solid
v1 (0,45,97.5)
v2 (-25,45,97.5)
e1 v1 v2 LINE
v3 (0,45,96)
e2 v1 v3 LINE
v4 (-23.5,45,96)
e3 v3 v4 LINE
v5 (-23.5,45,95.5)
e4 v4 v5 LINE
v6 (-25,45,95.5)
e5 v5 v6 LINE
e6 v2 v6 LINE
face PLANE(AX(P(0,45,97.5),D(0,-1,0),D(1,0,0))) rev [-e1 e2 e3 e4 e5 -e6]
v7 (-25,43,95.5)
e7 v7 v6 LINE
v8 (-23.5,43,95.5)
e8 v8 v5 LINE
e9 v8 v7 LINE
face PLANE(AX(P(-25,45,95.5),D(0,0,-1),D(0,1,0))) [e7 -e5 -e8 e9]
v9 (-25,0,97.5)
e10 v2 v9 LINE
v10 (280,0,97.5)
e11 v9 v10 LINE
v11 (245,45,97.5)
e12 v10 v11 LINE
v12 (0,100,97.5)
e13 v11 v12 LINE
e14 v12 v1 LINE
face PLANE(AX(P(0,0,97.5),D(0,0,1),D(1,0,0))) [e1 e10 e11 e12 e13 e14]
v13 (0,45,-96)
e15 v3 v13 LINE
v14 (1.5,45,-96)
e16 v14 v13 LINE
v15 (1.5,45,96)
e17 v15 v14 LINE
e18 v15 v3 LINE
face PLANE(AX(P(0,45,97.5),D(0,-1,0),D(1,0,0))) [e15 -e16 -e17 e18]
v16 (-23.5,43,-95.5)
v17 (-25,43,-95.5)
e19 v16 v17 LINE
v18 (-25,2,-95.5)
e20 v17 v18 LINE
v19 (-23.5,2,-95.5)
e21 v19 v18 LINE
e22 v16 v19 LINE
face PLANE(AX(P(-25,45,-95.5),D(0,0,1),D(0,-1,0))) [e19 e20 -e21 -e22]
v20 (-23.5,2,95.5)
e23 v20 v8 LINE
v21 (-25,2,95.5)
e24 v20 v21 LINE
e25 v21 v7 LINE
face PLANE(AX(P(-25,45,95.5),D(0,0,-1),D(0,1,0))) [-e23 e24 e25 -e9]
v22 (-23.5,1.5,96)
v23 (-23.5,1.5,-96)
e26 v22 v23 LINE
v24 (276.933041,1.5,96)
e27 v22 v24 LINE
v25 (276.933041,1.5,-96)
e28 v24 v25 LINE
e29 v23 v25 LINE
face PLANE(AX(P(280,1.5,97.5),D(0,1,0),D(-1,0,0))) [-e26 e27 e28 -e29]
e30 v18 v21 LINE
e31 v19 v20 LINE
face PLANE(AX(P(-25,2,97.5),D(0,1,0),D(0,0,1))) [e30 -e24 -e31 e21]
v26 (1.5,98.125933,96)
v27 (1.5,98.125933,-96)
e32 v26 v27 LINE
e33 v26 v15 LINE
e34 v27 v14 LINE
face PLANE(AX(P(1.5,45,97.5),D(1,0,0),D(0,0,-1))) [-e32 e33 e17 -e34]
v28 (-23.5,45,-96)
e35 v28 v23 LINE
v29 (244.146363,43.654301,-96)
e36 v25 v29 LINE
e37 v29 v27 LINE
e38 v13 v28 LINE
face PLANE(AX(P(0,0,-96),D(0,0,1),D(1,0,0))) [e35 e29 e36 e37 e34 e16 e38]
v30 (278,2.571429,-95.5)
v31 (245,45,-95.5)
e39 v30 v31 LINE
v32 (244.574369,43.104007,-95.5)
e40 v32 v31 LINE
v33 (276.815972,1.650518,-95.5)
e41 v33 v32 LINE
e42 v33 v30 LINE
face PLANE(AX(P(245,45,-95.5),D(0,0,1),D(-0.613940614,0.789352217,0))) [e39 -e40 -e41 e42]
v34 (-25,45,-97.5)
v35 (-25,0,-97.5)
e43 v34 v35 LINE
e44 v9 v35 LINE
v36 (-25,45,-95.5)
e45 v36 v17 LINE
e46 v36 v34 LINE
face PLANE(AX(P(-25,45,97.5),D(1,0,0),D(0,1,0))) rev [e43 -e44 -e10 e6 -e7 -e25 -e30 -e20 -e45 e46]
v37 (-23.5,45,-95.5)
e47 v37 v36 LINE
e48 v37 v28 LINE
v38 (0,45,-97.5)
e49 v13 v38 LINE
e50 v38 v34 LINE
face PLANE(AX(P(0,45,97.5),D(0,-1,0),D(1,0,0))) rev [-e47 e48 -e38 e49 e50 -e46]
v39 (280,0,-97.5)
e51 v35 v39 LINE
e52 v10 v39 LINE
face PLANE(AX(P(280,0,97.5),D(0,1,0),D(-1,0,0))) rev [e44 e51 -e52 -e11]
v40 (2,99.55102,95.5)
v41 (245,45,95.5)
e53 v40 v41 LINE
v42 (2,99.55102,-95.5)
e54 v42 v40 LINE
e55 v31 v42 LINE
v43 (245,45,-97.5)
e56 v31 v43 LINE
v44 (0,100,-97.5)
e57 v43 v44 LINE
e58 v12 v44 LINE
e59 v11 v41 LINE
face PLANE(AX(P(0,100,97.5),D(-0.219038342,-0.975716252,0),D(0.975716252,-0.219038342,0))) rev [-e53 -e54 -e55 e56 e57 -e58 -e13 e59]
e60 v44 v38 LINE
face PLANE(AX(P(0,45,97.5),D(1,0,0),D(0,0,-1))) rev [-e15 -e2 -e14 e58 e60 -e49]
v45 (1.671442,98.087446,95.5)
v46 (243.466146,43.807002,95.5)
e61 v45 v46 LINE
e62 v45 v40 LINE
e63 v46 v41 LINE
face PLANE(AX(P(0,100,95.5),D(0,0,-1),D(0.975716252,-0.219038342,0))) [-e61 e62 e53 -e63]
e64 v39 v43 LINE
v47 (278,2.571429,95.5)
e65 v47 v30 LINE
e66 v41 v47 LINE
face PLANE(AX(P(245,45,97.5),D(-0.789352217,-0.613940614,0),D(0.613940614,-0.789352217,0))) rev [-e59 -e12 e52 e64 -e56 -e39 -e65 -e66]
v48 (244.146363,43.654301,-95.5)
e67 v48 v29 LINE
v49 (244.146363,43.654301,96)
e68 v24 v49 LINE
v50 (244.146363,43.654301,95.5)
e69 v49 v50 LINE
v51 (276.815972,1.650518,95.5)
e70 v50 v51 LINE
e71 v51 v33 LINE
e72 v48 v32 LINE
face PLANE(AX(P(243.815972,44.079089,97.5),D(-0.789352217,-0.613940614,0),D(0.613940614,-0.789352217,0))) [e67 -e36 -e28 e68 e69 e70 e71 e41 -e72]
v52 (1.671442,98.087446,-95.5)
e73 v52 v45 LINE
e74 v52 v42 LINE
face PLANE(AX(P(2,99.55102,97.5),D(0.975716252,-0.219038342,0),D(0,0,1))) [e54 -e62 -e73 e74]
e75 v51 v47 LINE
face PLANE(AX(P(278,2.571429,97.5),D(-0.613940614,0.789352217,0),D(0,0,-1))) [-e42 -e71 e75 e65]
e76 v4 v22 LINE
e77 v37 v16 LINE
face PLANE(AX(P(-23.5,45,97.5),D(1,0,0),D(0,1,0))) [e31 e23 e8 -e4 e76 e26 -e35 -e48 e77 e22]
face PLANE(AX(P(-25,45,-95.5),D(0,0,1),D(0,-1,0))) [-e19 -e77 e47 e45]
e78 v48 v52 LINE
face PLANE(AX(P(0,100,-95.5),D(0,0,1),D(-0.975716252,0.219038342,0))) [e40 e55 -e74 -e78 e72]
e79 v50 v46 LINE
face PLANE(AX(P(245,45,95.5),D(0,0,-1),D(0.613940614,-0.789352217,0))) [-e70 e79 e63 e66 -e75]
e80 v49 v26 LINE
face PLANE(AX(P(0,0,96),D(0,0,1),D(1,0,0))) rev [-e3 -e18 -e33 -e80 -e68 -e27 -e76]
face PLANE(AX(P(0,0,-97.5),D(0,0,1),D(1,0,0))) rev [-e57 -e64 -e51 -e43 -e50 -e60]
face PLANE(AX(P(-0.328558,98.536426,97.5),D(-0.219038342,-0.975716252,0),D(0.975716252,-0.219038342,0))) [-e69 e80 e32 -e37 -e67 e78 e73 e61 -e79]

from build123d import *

# Parameters (mm, degrees)
BOSS_EXTRUDE1_DEPTH = 97.5
SHELL2_START        = -95.5
SHELL2_DEPTH        = 191
SHELL2_START_2      = -96
SHELL2_2_DEPTH      = 192


with BuildPart() as part:
    # Sketch2 → Boss-Extrude1 (new, symmetric)
    with BuildSketch(Plane.XY):
        Polygon((0, 100), (245, 45), (280, 0), (0, 0), (-25, 0), (-25, 45), (0, 45), align=None)
    extrude(amount=BOSS_EXTRUDE1_DEPTH, both=True)

    # Shell2: read off the stored shape, not the designer's step
    # Shell2 outline → Shell2 (cut)
    with BuildSketch(Plane.XY.offset(SHELL2_START)):
        Polygon((-25, 45), (-25, 2), (-23.5, 2), (-23.5, 1.5), (276.933040958, 1.5), (276.815971674, 1.650517651), (278, 2.571428571), (245, 45), (2, 99.551020408), (1.671442487, 98.08744603), (1.5, 98.125933119), (1.5, 45), align=None)
    extrude(amount=SHELL2_DEPTH, mode=Mode.SUBTRACT)

    # Shell2 2 outline → Shell2 2 (cut)
    with BuildSketch(Plane.XY.offset(SHELL2_START_2)):
        Polygon((-23.5, 45), (-23.5, 1.5), (276.933040958, 1.5), (244.146362645, 43.654300688), (1.5, 98.125933119), (1.5, 45), align=None)
    extrude(amount=SHELL2_2_DEPTH, mode=Mode.SUBTRACT)


solid = part.part
